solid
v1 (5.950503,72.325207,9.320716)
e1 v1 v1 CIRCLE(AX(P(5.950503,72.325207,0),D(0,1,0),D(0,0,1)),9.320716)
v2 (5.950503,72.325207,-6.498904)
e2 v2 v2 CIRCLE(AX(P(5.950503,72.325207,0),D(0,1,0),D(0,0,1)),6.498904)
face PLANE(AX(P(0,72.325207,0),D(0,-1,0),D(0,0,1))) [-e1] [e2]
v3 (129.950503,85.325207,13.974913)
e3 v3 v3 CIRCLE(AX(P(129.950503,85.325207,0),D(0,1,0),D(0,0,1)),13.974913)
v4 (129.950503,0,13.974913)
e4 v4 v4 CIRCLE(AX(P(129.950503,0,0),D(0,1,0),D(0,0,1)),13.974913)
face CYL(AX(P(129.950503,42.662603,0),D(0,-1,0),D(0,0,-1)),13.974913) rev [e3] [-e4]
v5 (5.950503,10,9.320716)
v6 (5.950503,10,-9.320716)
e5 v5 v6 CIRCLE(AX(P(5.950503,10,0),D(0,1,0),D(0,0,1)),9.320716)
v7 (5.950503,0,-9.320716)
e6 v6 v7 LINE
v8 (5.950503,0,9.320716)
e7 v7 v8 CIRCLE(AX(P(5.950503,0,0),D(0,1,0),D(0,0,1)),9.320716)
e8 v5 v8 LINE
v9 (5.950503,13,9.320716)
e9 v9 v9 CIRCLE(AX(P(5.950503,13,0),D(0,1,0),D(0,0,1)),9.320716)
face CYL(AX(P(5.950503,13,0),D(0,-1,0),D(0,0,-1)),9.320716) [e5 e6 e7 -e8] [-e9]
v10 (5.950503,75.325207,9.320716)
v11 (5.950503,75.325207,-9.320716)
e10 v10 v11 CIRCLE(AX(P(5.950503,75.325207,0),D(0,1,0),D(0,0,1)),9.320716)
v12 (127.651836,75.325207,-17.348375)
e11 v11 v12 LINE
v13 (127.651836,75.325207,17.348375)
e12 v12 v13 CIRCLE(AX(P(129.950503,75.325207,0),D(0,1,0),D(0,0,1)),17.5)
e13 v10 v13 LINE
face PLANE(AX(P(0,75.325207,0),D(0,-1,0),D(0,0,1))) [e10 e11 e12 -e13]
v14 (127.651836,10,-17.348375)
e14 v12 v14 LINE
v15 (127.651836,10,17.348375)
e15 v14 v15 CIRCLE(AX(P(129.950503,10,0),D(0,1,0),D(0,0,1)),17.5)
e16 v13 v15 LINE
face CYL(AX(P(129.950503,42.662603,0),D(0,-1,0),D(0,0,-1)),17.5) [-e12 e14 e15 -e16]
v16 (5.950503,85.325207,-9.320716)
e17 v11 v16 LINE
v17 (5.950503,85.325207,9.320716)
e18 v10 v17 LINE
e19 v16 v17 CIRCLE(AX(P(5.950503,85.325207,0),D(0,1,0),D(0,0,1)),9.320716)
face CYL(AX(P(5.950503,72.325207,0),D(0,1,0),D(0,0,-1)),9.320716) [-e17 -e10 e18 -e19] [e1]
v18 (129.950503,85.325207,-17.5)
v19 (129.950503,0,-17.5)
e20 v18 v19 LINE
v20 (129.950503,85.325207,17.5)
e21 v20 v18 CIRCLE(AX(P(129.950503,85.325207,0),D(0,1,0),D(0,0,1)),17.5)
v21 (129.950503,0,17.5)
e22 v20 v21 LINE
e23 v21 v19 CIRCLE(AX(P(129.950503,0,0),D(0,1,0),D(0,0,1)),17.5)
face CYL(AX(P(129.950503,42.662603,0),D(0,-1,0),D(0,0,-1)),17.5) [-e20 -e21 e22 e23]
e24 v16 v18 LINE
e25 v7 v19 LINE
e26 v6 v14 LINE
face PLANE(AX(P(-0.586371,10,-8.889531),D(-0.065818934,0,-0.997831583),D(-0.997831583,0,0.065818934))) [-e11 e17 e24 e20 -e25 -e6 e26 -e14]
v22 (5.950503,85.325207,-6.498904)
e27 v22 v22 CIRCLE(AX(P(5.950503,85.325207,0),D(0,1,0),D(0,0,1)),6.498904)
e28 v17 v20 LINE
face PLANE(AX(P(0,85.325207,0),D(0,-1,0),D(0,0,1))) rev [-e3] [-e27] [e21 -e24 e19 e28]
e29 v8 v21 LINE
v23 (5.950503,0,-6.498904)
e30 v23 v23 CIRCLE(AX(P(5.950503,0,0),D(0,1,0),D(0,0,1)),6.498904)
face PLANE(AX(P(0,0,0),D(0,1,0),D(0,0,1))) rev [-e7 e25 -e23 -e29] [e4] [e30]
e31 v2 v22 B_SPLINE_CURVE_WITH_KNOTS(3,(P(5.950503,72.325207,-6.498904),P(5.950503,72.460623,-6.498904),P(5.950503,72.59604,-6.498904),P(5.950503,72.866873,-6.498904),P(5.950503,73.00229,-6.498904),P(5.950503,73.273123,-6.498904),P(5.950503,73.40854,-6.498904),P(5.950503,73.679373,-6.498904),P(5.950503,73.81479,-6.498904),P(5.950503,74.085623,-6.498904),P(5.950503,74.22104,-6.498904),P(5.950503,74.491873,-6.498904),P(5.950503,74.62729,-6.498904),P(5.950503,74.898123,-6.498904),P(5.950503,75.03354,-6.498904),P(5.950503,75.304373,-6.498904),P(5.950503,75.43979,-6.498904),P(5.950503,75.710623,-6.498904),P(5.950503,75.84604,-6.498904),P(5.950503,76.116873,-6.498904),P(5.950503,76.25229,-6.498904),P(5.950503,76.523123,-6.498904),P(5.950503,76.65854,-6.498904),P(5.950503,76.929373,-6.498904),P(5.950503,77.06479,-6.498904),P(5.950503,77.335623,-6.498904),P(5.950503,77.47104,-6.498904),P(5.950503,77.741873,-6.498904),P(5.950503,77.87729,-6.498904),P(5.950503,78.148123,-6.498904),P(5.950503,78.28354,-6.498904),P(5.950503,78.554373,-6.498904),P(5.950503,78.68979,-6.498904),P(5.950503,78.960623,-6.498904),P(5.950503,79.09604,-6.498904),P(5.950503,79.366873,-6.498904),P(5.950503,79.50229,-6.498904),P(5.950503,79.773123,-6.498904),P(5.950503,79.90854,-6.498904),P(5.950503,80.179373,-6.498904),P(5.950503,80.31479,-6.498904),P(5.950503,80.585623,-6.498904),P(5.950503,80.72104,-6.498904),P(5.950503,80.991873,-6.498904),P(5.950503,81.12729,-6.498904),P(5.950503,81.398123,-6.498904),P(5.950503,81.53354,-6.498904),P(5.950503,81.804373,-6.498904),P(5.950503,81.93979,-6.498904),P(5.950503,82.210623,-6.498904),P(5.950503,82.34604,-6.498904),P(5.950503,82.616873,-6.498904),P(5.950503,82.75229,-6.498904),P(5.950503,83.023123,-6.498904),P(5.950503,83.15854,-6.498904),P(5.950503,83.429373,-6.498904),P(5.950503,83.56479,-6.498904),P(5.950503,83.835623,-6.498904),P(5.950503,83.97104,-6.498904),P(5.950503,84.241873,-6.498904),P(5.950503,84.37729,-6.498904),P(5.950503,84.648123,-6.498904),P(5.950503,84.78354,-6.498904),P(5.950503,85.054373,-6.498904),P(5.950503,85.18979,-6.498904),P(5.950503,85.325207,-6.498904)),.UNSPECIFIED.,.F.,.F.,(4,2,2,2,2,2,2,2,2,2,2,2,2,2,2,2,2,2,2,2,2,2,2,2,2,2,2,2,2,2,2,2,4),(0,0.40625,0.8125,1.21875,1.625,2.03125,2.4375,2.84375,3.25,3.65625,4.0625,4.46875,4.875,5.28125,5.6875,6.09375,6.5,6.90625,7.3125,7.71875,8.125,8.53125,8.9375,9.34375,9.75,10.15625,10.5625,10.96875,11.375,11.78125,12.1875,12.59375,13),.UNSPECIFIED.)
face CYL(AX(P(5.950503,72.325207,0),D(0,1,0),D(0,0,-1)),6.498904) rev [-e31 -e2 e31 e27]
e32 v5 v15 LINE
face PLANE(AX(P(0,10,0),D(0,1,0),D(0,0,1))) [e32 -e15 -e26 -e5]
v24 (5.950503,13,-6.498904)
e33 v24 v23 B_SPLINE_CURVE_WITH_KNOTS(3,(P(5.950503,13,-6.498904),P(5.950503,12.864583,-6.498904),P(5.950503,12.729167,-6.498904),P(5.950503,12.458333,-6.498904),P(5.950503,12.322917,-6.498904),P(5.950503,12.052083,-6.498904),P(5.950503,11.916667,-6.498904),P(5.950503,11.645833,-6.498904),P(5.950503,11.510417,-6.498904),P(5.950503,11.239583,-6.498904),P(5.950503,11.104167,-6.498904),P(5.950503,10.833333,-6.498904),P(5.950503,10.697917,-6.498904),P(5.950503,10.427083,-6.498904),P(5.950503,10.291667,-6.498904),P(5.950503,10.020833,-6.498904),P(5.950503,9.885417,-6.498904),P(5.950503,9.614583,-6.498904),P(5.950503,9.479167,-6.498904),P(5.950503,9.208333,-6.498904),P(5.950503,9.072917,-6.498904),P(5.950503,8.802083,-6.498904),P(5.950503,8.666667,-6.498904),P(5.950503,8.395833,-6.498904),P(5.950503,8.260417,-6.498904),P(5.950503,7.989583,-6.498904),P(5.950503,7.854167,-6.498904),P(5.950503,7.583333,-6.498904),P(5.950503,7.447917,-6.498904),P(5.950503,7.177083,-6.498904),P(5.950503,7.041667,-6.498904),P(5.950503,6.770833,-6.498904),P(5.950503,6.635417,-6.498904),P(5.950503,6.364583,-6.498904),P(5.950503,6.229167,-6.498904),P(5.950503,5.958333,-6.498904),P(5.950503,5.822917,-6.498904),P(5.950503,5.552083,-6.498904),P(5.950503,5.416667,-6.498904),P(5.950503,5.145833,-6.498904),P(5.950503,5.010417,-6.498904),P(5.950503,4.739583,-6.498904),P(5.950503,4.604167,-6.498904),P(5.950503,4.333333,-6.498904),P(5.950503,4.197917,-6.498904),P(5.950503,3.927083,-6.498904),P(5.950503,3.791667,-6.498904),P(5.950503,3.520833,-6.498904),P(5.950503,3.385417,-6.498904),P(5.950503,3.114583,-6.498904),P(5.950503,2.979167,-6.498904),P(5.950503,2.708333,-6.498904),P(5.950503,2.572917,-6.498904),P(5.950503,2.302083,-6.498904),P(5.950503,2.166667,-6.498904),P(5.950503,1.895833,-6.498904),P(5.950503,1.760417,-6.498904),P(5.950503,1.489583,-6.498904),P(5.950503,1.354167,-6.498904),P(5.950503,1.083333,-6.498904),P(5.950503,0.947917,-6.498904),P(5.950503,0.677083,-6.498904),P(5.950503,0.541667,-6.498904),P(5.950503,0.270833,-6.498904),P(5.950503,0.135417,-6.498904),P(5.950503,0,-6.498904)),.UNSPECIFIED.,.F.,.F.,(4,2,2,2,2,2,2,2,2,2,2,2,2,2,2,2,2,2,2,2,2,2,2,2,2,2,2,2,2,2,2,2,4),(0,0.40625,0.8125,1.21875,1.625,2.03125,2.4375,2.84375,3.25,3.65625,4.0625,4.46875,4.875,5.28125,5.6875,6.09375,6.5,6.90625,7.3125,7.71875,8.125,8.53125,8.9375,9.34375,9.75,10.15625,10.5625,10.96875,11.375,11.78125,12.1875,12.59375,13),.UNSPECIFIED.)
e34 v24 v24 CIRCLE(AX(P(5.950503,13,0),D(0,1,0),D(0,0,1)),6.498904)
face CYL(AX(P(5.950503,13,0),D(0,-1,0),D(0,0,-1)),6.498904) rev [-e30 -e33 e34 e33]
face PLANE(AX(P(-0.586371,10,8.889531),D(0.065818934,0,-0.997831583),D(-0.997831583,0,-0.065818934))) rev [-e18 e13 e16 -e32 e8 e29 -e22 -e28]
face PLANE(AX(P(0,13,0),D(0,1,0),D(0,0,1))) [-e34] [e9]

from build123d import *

# Parameters (mm, degrees)
CROQUIS11_R             = 9.320716026
CROQUIS11_R_2           = 6.498904475
SALIENTE_EXTRUIR7_DEPTH = 13
SALIENTE_EXTRUIR8_DEPTH = 10
CROQUIS11_17_R          = 13.974913408
SALIENTE_EXTRUIR9_DEPTH = 42.662603
SIMETR_A3_START         = 75.325206553
SIMETR_A3_OUTLINE_R     = 6.498904475
SIMETR_A3_OUTLINE_R_2   = 13.974913408
SIMETR_A3_DEPTH         = 10
SIMETR_A3_START_2       = 42.662603276
SIMETR_A3_2_OUTLINE_R   = 13.974913408
SIMETR_A3_2_DEPTH       = 32.662603277
SIMETR_A3_START_3       = 72.325206553
SIMETR_A3_3_OUTLINE_R   = 9.320716026
SIMETR_A3_3_OUTLINE_R_2 = 6.498904475
SIMETR_A3_3_DEPTH       = 3


# Read off the part's stored shape, not the designer's step: Simetría3
with BuildPart() as part:
    # Croquis11 → Saliente-Extruir7 (new body)
    with BuildSketch(Plane(origin=(0, 0, 0), x_dir=(1, 0, 0), z_dir=(0, 1, 0))):
        with Locations(Location((5.950503047, 0, 0), (0, 0, 90))):
            Circle(CROQUIS11_R)
        with Locations(Location((5.950503047, 0, 0), (0, 0, 90))):
            Circle(CROQUIS11_R_2, mode=Mode.SUBTRACT)
    extrude(amount=SALIENTE_EXTRUIR7_DEPTH)

    # Croquis11<13> → Saliente-Extruir8 (add)
    with BuildSketch(Plane(origin=(0, 0, 0), x_dir=(1, 0, 0), z_dir=(0, 1, 0))):
        with BuildLine():
            Line((112.450503047, 0), (15.271219073, 0))
            ThreePointArc((15.271219073, 0), (12.541244554, -6.590741507), (5.950503047, -9.320716026))
            Line((5.950503047, -9.320716026), (127.651835642, -17.348375375))
            ThreePointArc((127.651835642, -17.348375375), (116.788499408, -11.533068118), (112.450503047, 0))
        make_face()
        with BuildLine():
            ThreePointArc((5.950503047, 9.320716026), (12.541244554, 6.590741507), (15.271219073, 0))
            Line((15.271219073, 0), (112.450503047, 0))
            ThreePointArc((112.450503047, 0), (116.788499408, 11.533068118), (127.651835642, 17.348375375))
            Line((127.651835642, 17.348375375), (5.950503047, 9.320716026))
        make_face()
    extrude(amount=SALIENTE_EXTRUIR8_DEPTH)

    # Croquis11<17> → Saliente-Extruir9 (add)
    with BuildSketch(Plane(origin=(0, 0, 0), x_dir=(1, 0, 0), z_dir=(0, 1, 0))):
        with BuildLine():
            ThreePointArc((127.651835642, 17.348375375), (112.450503047, 0), (127.651835642, -17.348375375))
            Line((127.651835642, -17.348375375), (129.950503047, -17.5))
            ThreePointArc((129.950503047, -17.5), (142.324871718, -12.374368671), (147.450503047, 0))
            ThreePointArc((147.450503047, 0), (142.324871718, 12.374368671), (129.950503047, 17.5))
            Line((129.950503047, 17.5), (127.651835642, 17.348375375))
        make_face()
        with Locations(Location((129.950503047, 0, 0), (0, 0, 270))):
            Circle(CROQUIS11_17_R, mode=Mode.SUBTRACT)
    extrude(amount=SALIENTE_EXTRUIR9_DEPTH)



with BuildPart() as body_2:
    # Simetría3 outline → Simetría3 (new body)
    with BuildSketch(Plane(origin=(0, 0, 0), x_dir=(1, 0, 0), z_dir=(0, 1, 0)).offset(SIMETR_A3_START)):
        with BuildLine():
            ThreePointArc((5.950503047, 9.320716026), (-3.370212979, 0), (5.950503047, -9.320716026))
            Line((5.950503047, -9.320716026), (129.950503047, -17.5))
            ThreePointArc((129.950503047, -17.5), (147.450503047, 0), (129.950503047, 17.5))
            Line((129.950503047, 17.5), (5.950503047, 9.320716026))
        make_face()
        with Locations((5.950503047, 0)):
            Circle(SIMETR_A3_OUTLINE_R, mode=Mode.SUBTRACT)
        with Locations((129.950503047, 0)):
            Circle(SIMETR_A3_OUTLINE_R_2, mode=Mode.SUBTRACT)
    extrude(amount=SIMETR_A3_DEPTH)


with BuildPart() as part_1:
    add(part.part)

    add(body_2.part)  # Simetr_a3 2 merges body 2
    # Simetr_a3 2 outline → Simetr_a3 2 (add)
    with BuildSketch(Plane(origin=(0, 0, 0), x_dir=(1, 0, 0), z_dir=(0, 1, 0)).offset(SIMETR_A3_START_2)):
        with BuildLine():
            Line((129.950503047, 17.5), (127.651835642, 17.348375375))
            ThreePointArc((127.651835642, 17.348375375), (112.450503047, 0), (127.651835642, -17.348375375))
            Line((127.651835642, -17.348375375), (129.950503047, -17.5))
            ThreePointArc((129.950503047, -17.5), (147.450503047, 0), (129.950503047, 17.5))
        make_face()
        with Locations((129.950503047, 0)):
            Circle(SIMETR_A3_2_OUTLINE_R, mode=Mode.SUBTRACT)
    extrude(amount=SIMETR_A3_2_DEPTH)

    # Simetr_a3 3 outline → Simetr_a3 3 (add)
    with BuildSketch(Plane(origin=(0, 0, 0), x_dir=(1, 0, 0), z_dir=(0, 1, 0)).offset(SIMETR_A3_START_3)):
        with Locations((5.950503047, 0)):
            Circle(SIMETR_A3_3_OUTLINE_R)
        with Locations((5.950503047, 0)):
            Circle(SIMETR_A3_3_OUTLINE_R_2, mode=Mode.SUBTRACT)
    extrude(amount=SIMETR_A3_3_DEPTH)


solid = part_1.part
